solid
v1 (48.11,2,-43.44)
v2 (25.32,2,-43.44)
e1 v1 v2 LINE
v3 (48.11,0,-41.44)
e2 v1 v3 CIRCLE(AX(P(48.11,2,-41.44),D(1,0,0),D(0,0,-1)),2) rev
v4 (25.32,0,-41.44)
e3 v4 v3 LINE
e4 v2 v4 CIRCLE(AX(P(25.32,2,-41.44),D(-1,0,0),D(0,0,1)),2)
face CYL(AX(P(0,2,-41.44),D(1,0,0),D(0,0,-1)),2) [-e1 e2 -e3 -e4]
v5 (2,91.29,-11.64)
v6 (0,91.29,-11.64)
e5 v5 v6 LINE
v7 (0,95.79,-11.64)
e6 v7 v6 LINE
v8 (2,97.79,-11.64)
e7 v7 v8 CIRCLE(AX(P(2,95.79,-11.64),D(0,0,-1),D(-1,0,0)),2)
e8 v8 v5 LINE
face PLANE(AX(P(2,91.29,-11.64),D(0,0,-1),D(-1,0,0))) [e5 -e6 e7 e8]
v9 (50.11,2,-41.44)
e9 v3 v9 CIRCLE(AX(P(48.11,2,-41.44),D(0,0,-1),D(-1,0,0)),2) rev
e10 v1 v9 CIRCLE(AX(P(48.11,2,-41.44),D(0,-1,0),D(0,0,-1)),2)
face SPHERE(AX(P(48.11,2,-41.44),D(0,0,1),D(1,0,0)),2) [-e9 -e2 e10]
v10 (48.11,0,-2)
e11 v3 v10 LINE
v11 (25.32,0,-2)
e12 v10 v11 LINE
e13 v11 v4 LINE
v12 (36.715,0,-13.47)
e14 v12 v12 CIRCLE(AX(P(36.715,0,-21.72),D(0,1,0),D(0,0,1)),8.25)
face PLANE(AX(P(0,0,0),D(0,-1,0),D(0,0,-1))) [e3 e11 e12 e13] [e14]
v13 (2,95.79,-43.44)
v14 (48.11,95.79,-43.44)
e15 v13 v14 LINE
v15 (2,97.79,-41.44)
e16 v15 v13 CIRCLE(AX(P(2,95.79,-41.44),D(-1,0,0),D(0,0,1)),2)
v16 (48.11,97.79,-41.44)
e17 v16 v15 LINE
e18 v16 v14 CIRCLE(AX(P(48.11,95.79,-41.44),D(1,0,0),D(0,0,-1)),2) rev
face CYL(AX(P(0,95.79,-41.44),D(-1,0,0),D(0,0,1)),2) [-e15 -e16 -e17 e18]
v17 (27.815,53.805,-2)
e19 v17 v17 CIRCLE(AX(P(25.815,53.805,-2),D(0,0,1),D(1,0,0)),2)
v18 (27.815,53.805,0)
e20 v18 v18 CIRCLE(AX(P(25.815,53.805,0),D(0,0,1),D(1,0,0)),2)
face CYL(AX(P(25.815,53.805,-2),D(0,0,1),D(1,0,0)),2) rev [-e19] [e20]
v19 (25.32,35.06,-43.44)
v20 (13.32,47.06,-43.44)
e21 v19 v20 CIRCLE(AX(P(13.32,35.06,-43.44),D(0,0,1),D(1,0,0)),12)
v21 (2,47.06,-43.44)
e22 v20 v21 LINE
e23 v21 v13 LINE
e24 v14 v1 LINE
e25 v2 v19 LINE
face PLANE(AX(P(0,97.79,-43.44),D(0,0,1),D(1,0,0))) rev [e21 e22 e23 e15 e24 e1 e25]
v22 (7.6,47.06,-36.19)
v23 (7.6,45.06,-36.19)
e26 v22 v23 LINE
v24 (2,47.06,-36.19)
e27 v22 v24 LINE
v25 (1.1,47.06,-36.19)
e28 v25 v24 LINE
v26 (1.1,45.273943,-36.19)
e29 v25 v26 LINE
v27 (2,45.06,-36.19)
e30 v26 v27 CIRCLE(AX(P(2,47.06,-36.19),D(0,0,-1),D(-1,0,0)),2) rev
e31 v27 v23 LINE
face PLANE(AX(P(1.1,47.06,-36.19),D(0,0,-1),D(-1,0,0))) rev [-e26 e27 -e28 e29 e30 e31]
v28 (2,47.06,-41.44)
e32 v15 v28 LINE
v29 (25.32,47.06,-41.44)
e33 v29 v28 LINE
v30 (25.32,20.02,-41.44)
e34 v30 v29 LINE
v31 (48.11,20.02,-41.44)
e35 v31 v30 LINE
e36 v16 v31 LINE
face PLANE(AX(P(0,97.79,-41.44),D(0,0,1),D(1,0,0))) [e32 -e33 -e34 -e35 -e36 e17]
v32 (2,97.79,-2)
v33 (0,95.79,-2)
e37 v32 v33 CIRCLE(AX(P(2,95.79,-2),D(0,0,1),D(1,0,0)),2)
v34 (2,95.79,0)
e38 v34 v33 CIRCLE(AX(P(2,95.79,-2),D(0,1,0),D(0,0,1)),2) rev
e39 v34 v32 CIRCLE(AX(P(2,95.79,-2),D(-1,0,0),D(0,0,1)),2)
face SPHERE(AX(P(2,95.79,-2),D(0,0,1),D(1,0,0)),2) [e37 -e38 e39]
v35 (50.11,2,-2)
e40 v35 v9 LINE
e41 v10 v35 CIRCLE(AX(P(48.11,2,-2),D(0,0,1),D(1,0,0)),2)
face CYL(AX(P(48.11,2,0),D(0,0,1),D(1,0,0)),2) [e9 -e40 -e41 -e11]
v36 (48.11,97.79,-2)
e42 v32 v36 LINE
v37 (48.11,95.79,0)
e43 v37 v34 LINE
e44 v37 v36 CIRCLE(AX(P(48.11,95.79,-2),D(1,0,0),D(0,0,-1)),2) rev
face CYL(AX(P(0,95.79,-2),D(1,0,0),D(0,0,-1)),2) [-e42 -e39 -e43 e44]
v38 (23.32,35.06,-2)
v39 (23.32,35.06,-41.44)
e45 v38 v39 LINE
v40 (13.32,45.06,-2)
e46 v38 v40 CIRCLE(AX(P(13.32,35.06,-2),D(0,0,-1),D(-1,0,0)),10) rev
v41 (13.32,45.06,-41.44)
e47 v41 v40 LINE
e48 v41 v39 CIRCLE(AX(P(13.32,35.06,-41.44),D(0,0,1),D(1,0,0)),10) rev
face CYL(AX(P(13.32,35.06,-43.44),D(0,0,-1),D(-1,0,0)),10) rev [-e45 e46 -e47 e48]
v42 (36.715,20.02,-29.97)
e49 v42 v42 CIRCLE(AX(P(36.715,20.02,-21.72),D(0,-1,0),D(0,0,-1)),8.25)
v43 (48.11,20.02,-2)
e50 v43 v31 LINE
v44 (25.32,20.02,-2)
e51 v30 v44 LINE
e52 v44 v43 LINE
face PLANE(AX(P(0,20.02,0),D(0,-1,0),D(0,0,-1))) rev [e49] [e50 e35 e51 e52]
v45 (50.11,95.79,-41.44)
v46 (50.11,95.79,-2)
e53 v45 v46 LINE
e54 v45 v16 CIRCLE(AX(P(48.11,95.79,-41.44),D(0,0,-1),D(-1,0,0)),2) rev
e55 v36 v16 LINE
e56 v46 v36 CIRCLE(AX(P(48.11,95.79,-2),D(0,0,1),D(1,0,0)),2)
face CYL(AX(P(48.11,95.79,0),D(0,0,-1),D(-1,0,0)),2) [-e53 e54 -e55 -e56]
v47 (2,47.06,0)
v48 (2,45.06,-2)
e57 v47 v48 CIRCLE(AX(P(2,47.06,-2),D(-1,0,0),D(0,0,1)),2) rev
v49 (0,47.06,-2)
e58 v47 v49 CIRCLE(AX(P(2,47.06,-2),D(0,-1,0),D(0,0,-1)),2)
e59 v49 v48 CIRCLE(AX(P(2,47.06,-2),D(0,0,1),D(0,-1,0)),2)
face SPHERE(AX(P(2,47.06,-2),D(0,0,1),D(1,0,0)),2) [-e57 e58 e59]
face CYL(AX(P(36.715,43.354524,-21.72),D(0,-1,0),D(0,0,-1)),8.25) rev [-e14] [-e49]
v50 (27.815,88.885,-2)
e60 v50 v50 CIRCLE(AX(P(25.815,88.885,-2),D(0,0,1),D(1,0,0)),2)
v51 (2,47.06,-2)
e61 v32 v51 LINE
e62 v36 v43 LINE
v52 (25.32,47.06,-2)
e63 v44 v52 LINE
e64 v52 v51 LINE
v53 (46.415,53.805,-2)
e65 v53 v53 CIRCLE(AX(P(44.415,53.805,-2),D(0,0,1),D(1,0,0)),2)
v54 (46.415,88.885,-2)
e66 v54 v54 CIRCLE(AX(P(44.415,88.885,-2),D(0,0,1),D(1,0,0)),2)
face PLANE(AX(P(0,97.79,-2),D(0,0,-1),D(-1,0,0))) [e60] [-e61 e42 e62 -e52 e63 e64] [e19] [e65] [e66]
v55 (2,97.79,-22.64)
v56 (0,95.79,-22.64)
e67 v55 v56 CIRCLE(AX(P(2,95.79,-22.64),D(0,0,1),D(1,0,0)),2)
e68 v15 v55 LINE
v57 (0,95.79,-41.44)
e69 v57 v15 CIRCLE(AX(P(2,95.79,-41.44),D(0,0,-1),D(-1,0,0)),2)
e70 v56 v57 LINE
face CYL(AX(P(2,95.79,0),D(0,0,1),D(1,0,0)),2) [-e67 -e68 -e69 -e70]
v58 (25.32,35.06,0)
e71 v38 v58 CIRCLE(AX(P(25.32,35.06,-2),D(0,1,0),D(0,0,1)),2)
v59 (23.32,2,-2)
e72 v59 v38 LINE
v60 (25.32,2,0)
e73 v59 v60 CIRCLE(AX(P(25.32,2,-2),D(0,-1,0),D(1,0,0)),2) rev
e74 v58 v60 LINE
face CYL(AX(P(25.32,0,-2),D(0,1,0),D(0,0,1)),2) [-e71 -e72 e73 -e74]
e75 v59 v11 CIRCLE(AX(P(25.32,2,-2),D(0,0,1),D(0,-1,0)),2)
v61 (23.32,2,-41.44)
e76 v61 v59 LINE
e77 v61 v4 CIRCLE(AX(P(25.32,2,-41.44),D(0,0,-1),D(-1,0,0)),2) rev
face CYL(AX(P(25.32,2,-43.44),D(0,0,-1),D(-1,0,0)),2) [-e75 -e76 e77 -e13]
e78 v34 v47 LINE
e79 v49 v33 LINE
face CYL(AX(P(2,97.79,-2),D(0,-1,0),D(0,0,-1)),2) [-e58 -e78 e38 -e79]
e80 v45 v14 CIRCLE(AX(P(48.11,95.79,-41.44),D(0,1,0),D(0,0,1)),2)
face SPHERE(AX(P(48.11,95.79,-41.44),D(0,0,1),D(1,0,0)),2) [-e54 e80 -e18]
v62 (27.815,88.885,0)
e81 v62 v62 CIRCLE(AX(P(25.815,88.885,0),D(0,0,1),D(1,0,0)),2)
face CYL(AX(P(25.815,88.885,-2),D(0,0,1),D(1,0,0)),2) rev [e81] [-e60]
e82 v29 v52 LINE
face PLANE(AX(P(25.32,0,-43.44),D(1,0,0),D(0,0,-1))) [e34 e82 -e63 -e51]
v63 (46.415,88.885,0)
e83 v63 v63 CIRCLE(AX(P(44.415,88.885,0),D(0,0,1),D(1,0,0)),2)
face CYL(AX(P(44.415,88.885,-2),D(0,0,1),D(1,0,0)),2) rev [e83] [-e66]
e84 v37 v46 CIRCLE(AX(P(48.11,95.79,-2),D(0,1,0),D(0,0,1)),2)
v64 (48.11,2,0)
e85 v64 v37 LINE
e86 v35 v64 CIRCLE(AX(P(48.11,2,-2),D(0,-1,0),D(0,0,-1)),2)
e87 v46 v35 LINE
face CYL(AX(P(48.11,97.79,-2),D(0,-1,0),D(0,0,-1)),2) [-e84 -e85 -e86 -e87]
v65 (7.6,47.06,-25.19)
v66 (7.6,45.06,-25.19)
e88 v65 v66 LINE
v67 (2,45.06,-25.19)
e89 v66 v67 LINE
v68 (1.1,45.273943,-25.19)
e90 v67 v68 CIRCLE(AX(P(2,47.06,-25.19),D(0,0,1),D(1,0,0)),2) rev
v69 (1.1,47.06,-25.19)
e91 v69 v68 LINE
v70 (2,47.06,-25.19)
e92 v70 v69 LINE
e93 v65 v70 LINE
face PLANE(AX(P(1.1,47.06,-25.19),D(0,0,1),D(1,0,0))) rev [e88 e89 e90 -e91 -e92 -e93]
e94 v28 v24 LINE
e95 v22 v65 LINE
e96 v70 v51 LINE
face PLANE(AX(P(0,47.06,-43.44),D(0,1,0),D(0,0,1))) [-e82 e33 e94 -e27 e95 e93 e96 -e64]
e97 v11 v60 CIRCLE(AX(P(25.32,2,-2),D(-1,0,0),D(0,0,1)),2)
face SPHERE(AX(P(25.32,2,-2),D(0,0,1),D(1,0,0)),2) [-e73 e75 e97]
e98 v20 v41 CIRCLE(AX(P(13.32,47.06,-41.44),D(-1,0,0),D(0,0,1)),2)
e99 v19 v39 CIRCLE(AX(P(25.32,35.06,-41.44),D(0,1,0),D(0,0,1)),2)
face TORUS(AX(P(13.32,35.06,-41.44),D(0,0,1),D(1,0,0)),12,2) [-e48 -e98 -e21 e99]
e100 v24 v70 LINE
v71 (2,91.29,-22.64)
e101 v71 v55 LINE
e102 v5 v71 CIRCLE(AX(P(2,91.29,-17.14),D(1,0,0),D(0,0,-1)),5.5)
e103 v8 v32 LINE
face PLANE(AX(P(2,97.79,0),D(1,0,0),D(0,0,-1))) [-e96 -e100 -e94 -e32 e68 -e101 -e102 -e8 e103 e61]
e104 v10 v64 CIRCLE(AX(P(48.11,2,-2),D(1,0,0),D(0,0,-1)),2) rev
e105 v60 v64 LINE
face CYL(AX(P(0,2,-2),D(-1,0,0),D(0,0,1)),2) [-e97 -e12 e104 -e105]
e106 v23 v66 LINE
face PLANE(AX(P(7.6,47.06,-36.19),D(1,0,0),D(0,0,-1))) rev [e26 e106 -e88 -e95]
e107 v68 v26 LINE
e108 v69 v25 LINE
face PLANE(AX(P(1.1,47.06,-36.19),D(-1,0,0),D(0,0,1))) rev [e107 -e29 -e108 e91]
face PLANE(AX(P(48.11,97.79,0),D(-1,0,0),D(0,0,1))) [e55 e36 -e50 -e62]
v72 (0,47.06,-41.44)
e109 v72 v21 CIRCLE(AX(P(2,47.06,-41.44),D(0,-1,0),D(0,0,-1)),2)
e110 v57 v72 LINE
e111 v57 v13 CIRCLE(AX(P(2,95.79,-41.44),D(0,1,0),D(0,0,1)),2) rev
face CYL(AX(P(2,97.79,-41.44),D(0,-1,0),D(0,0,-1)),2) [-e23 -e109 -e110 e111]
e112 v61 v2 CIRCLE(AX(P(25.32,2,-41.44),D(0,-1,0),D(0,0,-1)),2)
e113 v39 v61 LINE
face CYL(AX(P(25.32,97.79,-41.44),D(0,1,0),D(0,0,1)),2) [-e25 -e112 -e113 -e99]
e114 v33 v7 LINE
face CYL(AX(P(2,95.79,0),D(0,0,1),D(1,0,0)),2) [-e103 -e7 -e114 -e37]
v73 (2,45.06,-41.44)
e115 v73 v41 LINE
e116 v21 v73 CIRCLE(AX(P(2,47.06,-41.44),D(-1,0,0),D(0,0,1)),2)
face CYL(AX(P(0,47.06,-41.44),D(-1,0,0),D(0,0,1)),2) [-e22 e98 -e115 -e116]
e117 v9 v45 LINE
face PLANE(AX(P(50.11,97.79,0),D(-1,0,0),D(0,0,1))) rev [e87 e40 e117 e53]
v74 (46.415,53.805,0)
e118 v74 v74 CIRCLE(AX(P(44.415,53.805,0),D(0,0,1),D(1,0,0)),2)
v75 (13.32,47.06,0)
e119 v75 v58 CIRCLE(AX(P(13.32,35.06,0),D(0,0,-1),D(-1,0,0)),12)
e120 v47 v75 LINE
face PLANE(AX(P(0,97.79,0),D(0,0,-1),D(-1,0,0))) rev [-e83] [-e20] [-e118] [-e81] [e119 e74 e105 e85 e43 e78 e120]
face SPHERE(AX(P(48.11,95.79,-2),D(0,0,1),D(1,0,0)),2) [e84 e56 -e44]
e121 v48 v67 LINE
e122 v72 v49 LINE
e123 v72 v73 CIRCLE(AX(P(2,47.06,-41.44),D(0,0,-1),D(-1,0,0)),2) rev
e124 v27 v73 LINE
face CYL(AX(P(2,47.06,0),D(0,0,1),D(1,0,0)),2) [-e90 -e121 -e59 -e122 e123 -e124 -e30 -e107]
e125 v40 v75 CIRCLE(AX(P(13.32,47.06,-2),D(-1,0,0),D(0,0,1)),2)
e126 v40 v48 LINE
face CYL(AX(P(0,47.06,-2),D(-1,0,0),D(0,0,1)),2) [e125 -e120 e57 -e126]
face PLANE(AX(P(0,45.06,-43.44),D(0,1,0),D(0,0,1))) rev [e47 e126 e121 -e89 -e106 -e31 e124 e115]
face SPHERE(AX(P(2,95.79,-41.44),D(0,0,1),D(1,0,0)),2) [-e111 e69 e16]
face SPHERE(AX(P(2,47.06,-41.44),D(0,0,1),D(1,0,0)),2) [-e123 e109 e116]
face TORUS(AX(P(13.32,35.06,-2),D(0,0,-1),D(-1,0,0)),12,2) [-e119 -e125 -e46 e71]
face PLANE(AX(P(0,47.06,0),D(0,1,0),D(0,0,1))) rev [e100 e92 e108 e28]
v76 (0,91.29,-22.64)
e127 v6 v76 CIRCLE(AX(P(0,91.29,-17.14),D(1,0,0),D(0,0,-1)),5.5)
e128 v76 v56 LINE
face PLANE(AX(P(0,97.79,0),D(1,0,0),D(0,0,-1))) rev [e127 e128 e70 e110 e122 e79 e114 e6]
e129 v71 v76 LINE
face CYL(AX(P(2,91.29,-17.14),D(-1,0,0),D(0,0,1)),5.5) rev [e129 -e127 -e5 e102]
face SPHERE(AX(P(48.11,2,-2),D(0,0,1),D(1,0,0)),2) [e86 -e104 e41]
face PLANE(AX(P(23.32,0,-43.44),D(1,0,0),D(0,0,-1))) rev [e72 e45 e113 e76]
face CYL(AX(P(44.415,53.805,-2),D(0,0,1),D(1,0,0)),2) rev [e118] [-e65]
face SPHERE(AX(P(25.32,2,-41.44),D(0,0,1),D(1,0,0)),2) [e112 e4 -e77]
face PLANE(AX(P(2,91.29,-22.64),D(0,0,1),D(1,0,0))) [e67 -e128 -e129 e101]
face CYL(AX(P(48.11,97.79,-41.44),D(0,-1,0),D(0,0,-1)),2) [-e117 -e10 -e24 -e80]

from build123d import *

# Parameters (mm, degrees)
SKETCH1_W                 = 50.11
SKETCH1_H                 = 43.44
BOSS_EXTRUDE1_DEPTH       = 97.79
SKETCH2_W                 = 23.32
SKETCH2_H                 = 45.06
CUT_EXTRUDE1_DEPTH        = 119.156378584
SHELL1_T                  = -2
SHELL1_THICKNESS_2_FACE_W = 39.44
SHELL1_THICKNESS_2_FACE_H = 22.79
SHELL1_THICKNESS_2_DEPTH  = 18.02
SKETCH4_W                 = 6.5
SKETCH4_H                 = 11
CUT_EXTRUDE2_DEPTH        = 2
SKETCH6_R                 = 2
CUT_EXTRUDE3_DEPTH        = 2
CUT_EXTRUDE5_DEPTH        = 2
SKETCH8_R                 = 8.25
CUT_EXTRUDE6_DEPTH        = 20.02
FILLET1_R                 = 10
FILLET2_R                 = 2


with BuildPart() as part:
    # Sketch1 → Boss-Extrude1 (new body)
    with BuildSketch(Plane(origin=(0, 0, 0), x_dir=(1, 0, 0), z_dir=(0, 1, 0))):
        with Locations((25.055, 21.72)):
            Rectangle(SKETCH1_W, SKETCH1_H)
    extrude(amount=BOSS_EXTRUDE1_DEPTH)

    # Sketch2 → Cut-Extrude1 (cut, through all)
    with BuildSketch(Plane.XY):
        with Locations((11.66, 22.53)):
            Rectangle(SKETCH2_W, SKETCH2_H)
    extrude(amount=-CUT_EXTRUDE1_DEPTH, mode=Mode.SUBTRACT)

    # Shell1
    shell1_openings = [part.faces().sort_by_distance(p)[0] for p in [
        (25.055, 97.79, -21.72),
    ]]
    offset(amount=SHELL1_T, openings=shell1_openings, kind=Kind.INTERSECTION)

    # Shell1 thickness 2 face (on inner face of the shell) → Shell1 thickness 2 (add)
    with BuildSketch(Plane(origin=(36.715, 2, -21.72), x_dir=(0, 0, -1), z_dir=(0, -1, 0))):
        Rectangle(SHELL1_THICKNESS_2_FACE_W, SHELL1_THICKNESS_2_FACE_H)
    extrude(amount=-SHELL1_THICKNESS_2_DEPTH)

    # Sketch4 → Cut-Extrude2 (cut)
    with BuildSketch(Plane.XZ.offset(-45.06)):
        with Locations((4.35, -30.69)):
            Rectangle(SKETCH4_W, SKETCH4_H)
    extrude(amount=-CUT_EXTRUDE2_DEPTH, mode=Mode.SUBTRACT)

    # Sketch6 → Cut-Extrude3 (cut)
    with BuildSketch(Plane.XY):
        with Locations((44.415, 88.885)):
            Circle(SKETCH6_R)
        with Locations((25.815, 88.885)):
            Circle(SKETCH6_R)
        with Locations((44.415, 53.805)):
            Circle(SKETCH6_R)
        with Locations((25.815, 53.805)):
            Circle(SKETCH6_R)
    extrude(amount=-CUT_EXTRUDE3_DEPTH, mode=Mode.SUBTRACT)

    # Sketch7 → Cut-Extrude5 (cut)
    with BuildSketch(Plane(origin=(0, 0, 0), x_dir=(0, 0, -1), z_dir=(1, 0, 0))):
        with BuildLine():
            Line((22.64, 91.29), (22.64, 97.79))
            Line((22.64, 97.79), (11.64, 97.79))
            Line((11.64, 97.79), (11.64, 91.29))
            ThreePointArc((11.64, 91.29), (17.14, 85.79), (22.64, 91.29))
        make_face()
    extrude(amount=CUT_EXTRUDE5_DEPTH, mode=Mode.SUBTRACT)

    # Sketch8 → Cut-Extrude6 (cut)
    with BuildSketch(Plane(origin=(0, 0, 0), x_dir=(1, 0, 0), z_dir=(0, 1, 0))):
        with Locations(Location((36.715, 21.72, 0), (0, 0, 90))):
            Circle(SKETCH8_R)
    extrude(amount=CUT_EXTRUDE6_DEPTH, mode=Mode.SUBTRACT)

    # Fillet1
    fillet1_edges = [part.edges().sort_by_distance(p)[0] for p in [
        (23.32, 45.06, -21.72),
    ]]
    fillet(fillet1_edges, radius=FILLET1_R)

    # Fillet2
    # the kernel refuses this fillet: 2 mm, written as the material it takes off along each edge
    with BuildSketch(Plane(origin=(2, 47.06, -2), x_dir=(0, -1, 0), z_dir=(0, 0, 1))) as fillet2_piece_1_section:
        Polygon((0, 0), (FILLET2_R, 0), (FILLET2_R, -FILLET2_R), (0, -FILLET2_R), align=None)
    fillet2_piece_1 = extrude(amount=FILLET2_R, mode=Mode.PRIVATE)
    fillet2_piece_1 = fillet2_piece_1 - Plane(origin=(2, 47.06, -2), x_dir=(0.7071067811865475, 0.7071067811865475, 0), z_dir=(0, 0, 1)) * Sphere(FILLET2_R, mode=Mode.PRIVATE)
    add(fillet2_piece_1, mode=Mode.SUBTRACT)
    with BuildSketch(Plane(origin=(2, 47.06, -41.44), x_dir=(-1, 0, 0), z_dir=(0, -1, 0))) as fillet2_piece_2_section:
        Polygon((0, 0), (FILLET2_R, 0), (FILLET2_R, FILLET2_R), (0, FILLET2_R), align=None)
    fillet2_piece_2 = extrude(amount=FILLET2_R, mode=Mode.PRIVATE)
    fillet2_piece_2 = fillet2_piece_2 - Plane(origin=(2, 47.06, -41.44), x_dir=(0.7071067811865475, 0, 0.7071067811865475), z_dir=(0, -1, 0)) * Sphere(FILLET2_R, mode=Mode.PRIVATE)
    add(fillet2_piece_2, mode=Mode.SUBTRACT)
    with BuildSketch(Plane(origin=(2, 95.79, -2), x_dir=(-1, 0, 0), z_dir=(0, 0, 1))) as fillet2_piece_3_section:
        Polygon((0, 0), (FILLET2_R, 0), (FILLET2_R, -FILLET2_R), (0, -FILLET2_R), align=None)
    fillet2_piece_3 = extrude(amount=FILLET2_R, mode=Mode.PRIVATE)
    fillet2_piece_3 = fillet2_piece_3 - Plane(origin=(2, 95.79, -2), x_dir=(0.7071067811865475, -0.7071067811865475, 0), z_dir=(0, 0, 1)) * Sphere(FILLET2_R, mode=Mode.PRIVATE)
    add(fillet2_piece_3, mode=Mode.SUBTRACT)
    with BuildSketch(Plane(origin=(2, 95.79, -41.44), x_dir=(0, 0, -1), z_dir=(-1, 0, 0))) as fillet2_piece_4_section:
        Polygon((0, 0), (FILLET2_R, 0), (FILLET2_R, -FILLET2_R), (0, -FILLET2_R), align=None)
    fillet2_piece_4 = extrude(amount=FILLET2_R, mode=Mode.PRIVATE)
    fillet2_piece_4 = fillet2_piece_4 - Plane(origin=(2, 95.79, -41.44), x_dir=(0, -0.7071067811865475, 0.7071067811865475), z_dir=(-1, 0, 0)) * Sphere(FILLET2_R, mode=Mode.PRIVATE)
    add(fillet2_piece_4, mode=Mode.SUBTRACT)
    with BuildSketch(Plane(origin=(25.32, 2, -2), x_dir=(-1, 0, 0), z_dir=(0, 0, 1))) as fillet2_piece_5_section:
        Polygon((0, 0), (FILLET2_R, 0), (FILLET2_R, FILLET2_R), (0, FILLET2_R), align=None)
    fillet2_piece_5 = extrude(amount=FILLET2_R, mode=Mode.PRIVATE)
    fillet2_piece_5 = fillet2_piece_5 - Plane(origin=(25.32, 2, -2), x_dir=(0.7071067811865475, 0.7071067811865475, 0), z_dir=(0, 0, 1)) * Sphere(FILLET2_R, mode=Mode.PRIVATE)
    add(fillet2_piece_5, mode=Mode.SUBTRACT)
    with BuildSketch(Plane(origin=(25.32, 2, -41.44), x_dir=(0, 0, -1), z_dir=(-1, 0, 0))) as fillet2_piece_6_section:
        Polygon((0, 0), (FILLET2_R, 0), (FILLET2_R, FILLET2_R), (0, FILLET2_R), align=None)
    fillet2_piece_6 = extrude(amount=FILLET2_R, mode=Mode.PRIVATE)
    fillet2_piece_6 = fillet2_piece_6 - Plane(origin=(25.32, 2, -41.44), x_dir=(0, 0.7071067811865475, 0.7071067811865475), z_dir=(-1, 0, 0)) * Sphere(FILLET2_R, mode=Mode.PRIVATE)
    add(fillet2_piece_6, mode=Mode.SUBTRACT)
    with BuildSketch(Plane(origin=(48.11, 2, -2), x_dir=(0, -1, 0), z_dir=(0, 0, 1))) as fillet2_piece_7_section:
        Polygon((0, 0), (FILLET2_R, 0), (FILLET2_R, FILLET2_R), (0, FILLET2_R), align=None)
    fillet2_piece_7 = extrude(amount=FILLET2_R, mode=Mode.PRIVATE)
    fillet2_piece_7 = fillet2_piece_7 - Plane(origin=(48.11, 2, -2), x_dir=(-0.7071067811865475, 0.7071067811865475, 0), z_dir=(0, 0, 1)) * Sphere(FILLET2_R, mode=Mode.PRIVATE)
    add(fillet2_piece_7, mode=Mode.SUBTRACT)
    with BuildSketch(Plane(origin=(48.11, 95.79, -2), x_dir=(0, 1, 0), z_dir=(0, 0, 1))) as fillet2_piece_8_section:
        Polygon((0, 0), (FILLET2_R, 0), (FILLET2_R, -FILLET2_R), (0, -FILLET2_R), align=None)
    fillet2_piece_8 = extrude(amount=FILLET2_R, mode=Mode.PRIVATE)
    fillet2_piece_8 = fillet2_piece_8 - Plane(origin=(48.11, 95.79, -2), x_dir=(-0.7071067811865475, -0.7071067811865475, 0), z_dir=(0, 0, 1)) * Sphere(FILLET2_R, mode=Mode.PRIVATE)
    add(fillet2_piece_8, mode=Mode.SUBTRACT)
    with BuildSketch(Plane(origin=(48.11, 95.79, -41.44), x_dir=(0, 1, 0), z_dir=(0, 0, -1))) as fillet2_piece_9_section:
        Polygon((0, 0), (FILLET2_R, 0), (FILLET2_R, FILLET2_R), (0, FILLET2_R), align=None)
    fillet2_piece_9 = extrude(amount=FILLET2_R, mode=Mode.PRIVATE)
    fillet2_piece_9 = fillet2_piece_9 - Plane(origin=(48.11, 95.79, -41.44), x_dir=(-0.7071067811865475, -0.7071067811865475, 0), z_dir=(0, 0, -1)) * Sphere(FILLET2_R, mode=Mode.PRIVATE)
    add(fillet2_piece_9, mode=Mode.SUBTRACT)
    with BuildSketch(Plane(origin=(48.11, 2, -41.44), x_dir=(0, -1, 0), z_dir=(0, 0, -1))) as fillet2_piece_10_section:
        Polygon((0, 0), (FILLET2_R, 0), (FILLET2_R, -FILLET2_R), (0, -FILLET2_R), align=None)
    fillet2_piece_10 = extrude(amount=FILLET2_R, mode=Mode.PRIVATE)
    fillet2_piece_10 = fillet2_piece_10 - Plane(origin=(48.11, 2, -41.44), x_dir=(-0.7071067811865475, 0.7071067811865475, 0), z_dir=(0, 0, -1)) * Sphere(FILLET2_R, mode=Mode.PRIVATE)
    add(fillet2_piece_10, mode=Mode.SUBTRACT)
    with BuildSketch(Plane(origin=(0, 45.06, -2), x_dir=(1, 0, 0), z_dir=(0, 0, -1)), Plane(origin=(50.11, 97.79, -2), x_dir=(-1, 0, 0), z_dir=(0, 0, -1))) as fillet2_piece_11:
        with BuildLine():
            CenterArc((FILLET2_R, -FILLET2_R), FILLET2_R, 90, 90)
            Line((0, -FILLET2_R), (0, 0))
            Line((0, 0), (FILLET2_R, 0))
        make_face()
    extrude(amount=39.44, mode=Mode.SUBTRACT)
    with BuildSketch(Plane(origin=(0, 97.79, -16.64), x_dir=(0, -1, 0), z_dir=(0, 0, 1))) as fillet2_piece_12:
        with BuildLine():
            CenterArc((FILLET2_R, FILLET2_R), FILLET2_R, 180, 90)
            Line((0, FILLET2_R), (0, 0))
            Line((0, 0), (FILLET2_R, 0))
        make_face()
    extrude(amount=14.64, mode=Mode.SUBTRACT)
    with BuildSketch(Plane(origin=(0, 47.06, 0), x_dir=(1, 0, 0), z_dir=(0, 1, 0)), Plane(origin=(0, 47.06, -43.44), x_dir=(0, 0, 1), z_dir=(0, 1, 0))) as fillet2_piece_13:
        with BuildLine():
            CenterArc((FILLET2_R, FILLET2_R), FILLET2_R, 180, 90)
            Line((0, FILLET2_R), (0, 0))
            Line((0, 0), (FILLET2_R, 0))
        make_face()
    extrude(amount=48.73, mode=Mode.SUBTRACT)
    with BuildSketch(Plane(origin=(0, 97.79, -41.44), x_dir=(0, -1, 0), z_dir=(0, 0, 1))) as fillet2_piece_14:
        with BuildLine():
            CenterArc((FILLET2_R, FILLET2_R), FILLET2_R, 180, 90)
            Line((0, FILLET2_R), (0, 0))
            Line((0, 0), (FILLET2_R, 0))
        make_face()
    extrude(amount=23.8, mode=Mode.SUBTRACT)
    with BuildSketch(Plane(origin=(13.32, 45.06, 0), x_dir=(0, 1, 0), z_dir=(-1, 0, 0)), Plane(origin=(13.32, 45.06, -43.44), x_dir=(0, 0, 1), z_dir=(-1, 0, 0))) as fillet2_piece_15:
        with BuildLine():
            CenterArc((FILLET2_R, FILLET2_R), FILLET2_R, 180, 90)
            Line((0, FILLET2_R), (0, 0))
            Line((0, 0), (FILLET2_R, 0))
        make_face()
    extrude(amount=11.32, mode=Mode.SUBTRACT)
    with BuildSketch(Plane(origin=(23.32, 2, 0), x_dir=(1, 0, 0), z_dir=(0, 1, 0)), Plane(origin=(23.32, 2, -43.44), x_dir=(0, 0, 1), z_dir=(0, 1, 0))) as fillet2_piece_16:
        with BuildLine():
            CenterArc((FILLET2_R, FILLET2_R), FILLET2_R, 180, 90)
            Line((0, FILLET2_R), (0, 0))
            Line((0, 0), (FILLET2_R, 0))
        make_face()
    extrude(amount=33.06, mode=Mode.SUBTRACT)
    with BuildSketch(Plane(origin=(50.11, 2, 0), x_dir=(-1, 0, 0), z_dir=(0, 1, 0)), Plane(origin=(50.11, 2, -43.44), x_dir=(0, 0, 1), z_dir=(0, 1, 0))) as fillet2_piece_17:
        with BuildLine():
            CenterArc((FILLET2_R, -FILLET2_R), FILLET2_R, 90, 90)
            Line((0, -FILLET2_R), (0, 0))
            Line((0, 0), (FILLET2_R, 0))
        make_face()
    extrude(amount=93.79, mode=Mode.SUBTRACT)
    with BuildSketch(Plane(origin=(25.32, 0, 0), x_dir=(0, 1, 0), z_dir=(1, 0, 0))) as fillet2_piece_18:
        with BuildLine():
            CenterArc((FILLET2_R, -FILLET2_R), FILLET2_R, 90, 90)
            Line((0, -FILLET2_R), (0, 0))
            Line((0, 0), (FILLET2_R, 0))
        make_face()
    extrude(amount=22.79, mode=Mode.SUBTRACT)
    with BuildSketch(Plane(origin=(50.11, 0, -2), x_dir=(-1, 0, 0), z_dir=(0, 0, -1)), Plane(origin=(23.32, 0, -2), x_dir=(0, 1, 0), z_dir=(0, 0, -1))) as fillet2_piece_19:
        with BuildLine():
            CenterArc((FILLET2_R, FILLET2_R), FILLET2_R, 180, 90)
            Line((0, FILLET2_R), (0, 0))
            Line((0, 0), (FILLET2_R, 0))
        make_face()
    extrude(amount=39.44, mode=Mode.SUBTRACT)
    with BuildSketch(Plane(origin=(48.11, 0, -43.44), x_dir=(0, 0, 1), z_dir=(-1, 0, 0))) as fillet2_piece_20:
        with BuildLine():
            CenterArc((FILLET2_R, FILLET2_R), FILLET2_R, 180, 90)
            Line((0, FILLET2_R), (0, 0))
            Line((0, 0), (FILLET2_R, 0))
        make_face()
    extrude(amount=22.79, mode=Mode.SUBTRACT)
    with BuildSketch(Plane(origin=(13.32, 35.06, 0), x_dir=(0, 1, 0), z_dir=(-1, 0, 0))) as fillet2_piece_21:
        with BuildLine():
            CenterArc((10 + FILLET2_R, FILLET2_R), FILLET2_R, 180, 90)
            Line((10, FILLET2_R), (10, 0))
            Line((10, 0), (10 + FILLET2_R, 0))
        make_face()
    revolve(axis=Axis((13.32, 35.06, 0), (0, 0, -1)), revolution_arc=90, mode=Mode.SUBTRACT)
    with BuildSketch(Plane(origin=(13.32, 35.06, -43.44), x_dir=(0, 1, 0), z_dir=(-1, 0, 0))) as fillet2_piece_22:
        with BuildLine():
            CenterArc((10 + FILLET2_R, -FILLET2_R), FILLET2_R, 90, 90)
            Line((10 + FILLET2_R, 0), (10, 0))
            Line((10, 0), (10, -FILLET2_R))
        make_face()
    revolve(axis=Axis((13.32, 35.06, -43.44), (0, 0, -1)), revolution_arc=90, mode=Mode.SUBTRACT)
    with BuildSketch(Plane(origin=(2, 97.79, 0), x_dir=(0, -1, 0), z_dir=(1, 0, 0))) as fillet2_piece_23:
        with BuildLine():
            CenterArc((FILLET2_R, FILLET2_R), FILLET2_R, 180, 90)
            Line((0, FILLET2_R), (0, 0))
            Line((0, 0), (FILLET2_R, 0))
        make_face()
    extrude(amount=46.11, mode=Mode.SUBTRACT)
    with BuildSketch(Plane(origin=(48.11, 97.79, -43.44), x_dir=(0, 0, 1), z_dir=(-1, 0, 0))) as fillet2_piece_24:
        with BuildLine():
            CenterArc((FILLET2_R, -FILLET2_R), FILLET2_R, 90, 90)
            Line((0, -FILLET2_R), (0, 0))
            Line((0, 0), (FILLET2_R, 0))
        make_face()
    extrude(amount=46.11, mode=Mode.SUBTRACT)


solid = part.part
